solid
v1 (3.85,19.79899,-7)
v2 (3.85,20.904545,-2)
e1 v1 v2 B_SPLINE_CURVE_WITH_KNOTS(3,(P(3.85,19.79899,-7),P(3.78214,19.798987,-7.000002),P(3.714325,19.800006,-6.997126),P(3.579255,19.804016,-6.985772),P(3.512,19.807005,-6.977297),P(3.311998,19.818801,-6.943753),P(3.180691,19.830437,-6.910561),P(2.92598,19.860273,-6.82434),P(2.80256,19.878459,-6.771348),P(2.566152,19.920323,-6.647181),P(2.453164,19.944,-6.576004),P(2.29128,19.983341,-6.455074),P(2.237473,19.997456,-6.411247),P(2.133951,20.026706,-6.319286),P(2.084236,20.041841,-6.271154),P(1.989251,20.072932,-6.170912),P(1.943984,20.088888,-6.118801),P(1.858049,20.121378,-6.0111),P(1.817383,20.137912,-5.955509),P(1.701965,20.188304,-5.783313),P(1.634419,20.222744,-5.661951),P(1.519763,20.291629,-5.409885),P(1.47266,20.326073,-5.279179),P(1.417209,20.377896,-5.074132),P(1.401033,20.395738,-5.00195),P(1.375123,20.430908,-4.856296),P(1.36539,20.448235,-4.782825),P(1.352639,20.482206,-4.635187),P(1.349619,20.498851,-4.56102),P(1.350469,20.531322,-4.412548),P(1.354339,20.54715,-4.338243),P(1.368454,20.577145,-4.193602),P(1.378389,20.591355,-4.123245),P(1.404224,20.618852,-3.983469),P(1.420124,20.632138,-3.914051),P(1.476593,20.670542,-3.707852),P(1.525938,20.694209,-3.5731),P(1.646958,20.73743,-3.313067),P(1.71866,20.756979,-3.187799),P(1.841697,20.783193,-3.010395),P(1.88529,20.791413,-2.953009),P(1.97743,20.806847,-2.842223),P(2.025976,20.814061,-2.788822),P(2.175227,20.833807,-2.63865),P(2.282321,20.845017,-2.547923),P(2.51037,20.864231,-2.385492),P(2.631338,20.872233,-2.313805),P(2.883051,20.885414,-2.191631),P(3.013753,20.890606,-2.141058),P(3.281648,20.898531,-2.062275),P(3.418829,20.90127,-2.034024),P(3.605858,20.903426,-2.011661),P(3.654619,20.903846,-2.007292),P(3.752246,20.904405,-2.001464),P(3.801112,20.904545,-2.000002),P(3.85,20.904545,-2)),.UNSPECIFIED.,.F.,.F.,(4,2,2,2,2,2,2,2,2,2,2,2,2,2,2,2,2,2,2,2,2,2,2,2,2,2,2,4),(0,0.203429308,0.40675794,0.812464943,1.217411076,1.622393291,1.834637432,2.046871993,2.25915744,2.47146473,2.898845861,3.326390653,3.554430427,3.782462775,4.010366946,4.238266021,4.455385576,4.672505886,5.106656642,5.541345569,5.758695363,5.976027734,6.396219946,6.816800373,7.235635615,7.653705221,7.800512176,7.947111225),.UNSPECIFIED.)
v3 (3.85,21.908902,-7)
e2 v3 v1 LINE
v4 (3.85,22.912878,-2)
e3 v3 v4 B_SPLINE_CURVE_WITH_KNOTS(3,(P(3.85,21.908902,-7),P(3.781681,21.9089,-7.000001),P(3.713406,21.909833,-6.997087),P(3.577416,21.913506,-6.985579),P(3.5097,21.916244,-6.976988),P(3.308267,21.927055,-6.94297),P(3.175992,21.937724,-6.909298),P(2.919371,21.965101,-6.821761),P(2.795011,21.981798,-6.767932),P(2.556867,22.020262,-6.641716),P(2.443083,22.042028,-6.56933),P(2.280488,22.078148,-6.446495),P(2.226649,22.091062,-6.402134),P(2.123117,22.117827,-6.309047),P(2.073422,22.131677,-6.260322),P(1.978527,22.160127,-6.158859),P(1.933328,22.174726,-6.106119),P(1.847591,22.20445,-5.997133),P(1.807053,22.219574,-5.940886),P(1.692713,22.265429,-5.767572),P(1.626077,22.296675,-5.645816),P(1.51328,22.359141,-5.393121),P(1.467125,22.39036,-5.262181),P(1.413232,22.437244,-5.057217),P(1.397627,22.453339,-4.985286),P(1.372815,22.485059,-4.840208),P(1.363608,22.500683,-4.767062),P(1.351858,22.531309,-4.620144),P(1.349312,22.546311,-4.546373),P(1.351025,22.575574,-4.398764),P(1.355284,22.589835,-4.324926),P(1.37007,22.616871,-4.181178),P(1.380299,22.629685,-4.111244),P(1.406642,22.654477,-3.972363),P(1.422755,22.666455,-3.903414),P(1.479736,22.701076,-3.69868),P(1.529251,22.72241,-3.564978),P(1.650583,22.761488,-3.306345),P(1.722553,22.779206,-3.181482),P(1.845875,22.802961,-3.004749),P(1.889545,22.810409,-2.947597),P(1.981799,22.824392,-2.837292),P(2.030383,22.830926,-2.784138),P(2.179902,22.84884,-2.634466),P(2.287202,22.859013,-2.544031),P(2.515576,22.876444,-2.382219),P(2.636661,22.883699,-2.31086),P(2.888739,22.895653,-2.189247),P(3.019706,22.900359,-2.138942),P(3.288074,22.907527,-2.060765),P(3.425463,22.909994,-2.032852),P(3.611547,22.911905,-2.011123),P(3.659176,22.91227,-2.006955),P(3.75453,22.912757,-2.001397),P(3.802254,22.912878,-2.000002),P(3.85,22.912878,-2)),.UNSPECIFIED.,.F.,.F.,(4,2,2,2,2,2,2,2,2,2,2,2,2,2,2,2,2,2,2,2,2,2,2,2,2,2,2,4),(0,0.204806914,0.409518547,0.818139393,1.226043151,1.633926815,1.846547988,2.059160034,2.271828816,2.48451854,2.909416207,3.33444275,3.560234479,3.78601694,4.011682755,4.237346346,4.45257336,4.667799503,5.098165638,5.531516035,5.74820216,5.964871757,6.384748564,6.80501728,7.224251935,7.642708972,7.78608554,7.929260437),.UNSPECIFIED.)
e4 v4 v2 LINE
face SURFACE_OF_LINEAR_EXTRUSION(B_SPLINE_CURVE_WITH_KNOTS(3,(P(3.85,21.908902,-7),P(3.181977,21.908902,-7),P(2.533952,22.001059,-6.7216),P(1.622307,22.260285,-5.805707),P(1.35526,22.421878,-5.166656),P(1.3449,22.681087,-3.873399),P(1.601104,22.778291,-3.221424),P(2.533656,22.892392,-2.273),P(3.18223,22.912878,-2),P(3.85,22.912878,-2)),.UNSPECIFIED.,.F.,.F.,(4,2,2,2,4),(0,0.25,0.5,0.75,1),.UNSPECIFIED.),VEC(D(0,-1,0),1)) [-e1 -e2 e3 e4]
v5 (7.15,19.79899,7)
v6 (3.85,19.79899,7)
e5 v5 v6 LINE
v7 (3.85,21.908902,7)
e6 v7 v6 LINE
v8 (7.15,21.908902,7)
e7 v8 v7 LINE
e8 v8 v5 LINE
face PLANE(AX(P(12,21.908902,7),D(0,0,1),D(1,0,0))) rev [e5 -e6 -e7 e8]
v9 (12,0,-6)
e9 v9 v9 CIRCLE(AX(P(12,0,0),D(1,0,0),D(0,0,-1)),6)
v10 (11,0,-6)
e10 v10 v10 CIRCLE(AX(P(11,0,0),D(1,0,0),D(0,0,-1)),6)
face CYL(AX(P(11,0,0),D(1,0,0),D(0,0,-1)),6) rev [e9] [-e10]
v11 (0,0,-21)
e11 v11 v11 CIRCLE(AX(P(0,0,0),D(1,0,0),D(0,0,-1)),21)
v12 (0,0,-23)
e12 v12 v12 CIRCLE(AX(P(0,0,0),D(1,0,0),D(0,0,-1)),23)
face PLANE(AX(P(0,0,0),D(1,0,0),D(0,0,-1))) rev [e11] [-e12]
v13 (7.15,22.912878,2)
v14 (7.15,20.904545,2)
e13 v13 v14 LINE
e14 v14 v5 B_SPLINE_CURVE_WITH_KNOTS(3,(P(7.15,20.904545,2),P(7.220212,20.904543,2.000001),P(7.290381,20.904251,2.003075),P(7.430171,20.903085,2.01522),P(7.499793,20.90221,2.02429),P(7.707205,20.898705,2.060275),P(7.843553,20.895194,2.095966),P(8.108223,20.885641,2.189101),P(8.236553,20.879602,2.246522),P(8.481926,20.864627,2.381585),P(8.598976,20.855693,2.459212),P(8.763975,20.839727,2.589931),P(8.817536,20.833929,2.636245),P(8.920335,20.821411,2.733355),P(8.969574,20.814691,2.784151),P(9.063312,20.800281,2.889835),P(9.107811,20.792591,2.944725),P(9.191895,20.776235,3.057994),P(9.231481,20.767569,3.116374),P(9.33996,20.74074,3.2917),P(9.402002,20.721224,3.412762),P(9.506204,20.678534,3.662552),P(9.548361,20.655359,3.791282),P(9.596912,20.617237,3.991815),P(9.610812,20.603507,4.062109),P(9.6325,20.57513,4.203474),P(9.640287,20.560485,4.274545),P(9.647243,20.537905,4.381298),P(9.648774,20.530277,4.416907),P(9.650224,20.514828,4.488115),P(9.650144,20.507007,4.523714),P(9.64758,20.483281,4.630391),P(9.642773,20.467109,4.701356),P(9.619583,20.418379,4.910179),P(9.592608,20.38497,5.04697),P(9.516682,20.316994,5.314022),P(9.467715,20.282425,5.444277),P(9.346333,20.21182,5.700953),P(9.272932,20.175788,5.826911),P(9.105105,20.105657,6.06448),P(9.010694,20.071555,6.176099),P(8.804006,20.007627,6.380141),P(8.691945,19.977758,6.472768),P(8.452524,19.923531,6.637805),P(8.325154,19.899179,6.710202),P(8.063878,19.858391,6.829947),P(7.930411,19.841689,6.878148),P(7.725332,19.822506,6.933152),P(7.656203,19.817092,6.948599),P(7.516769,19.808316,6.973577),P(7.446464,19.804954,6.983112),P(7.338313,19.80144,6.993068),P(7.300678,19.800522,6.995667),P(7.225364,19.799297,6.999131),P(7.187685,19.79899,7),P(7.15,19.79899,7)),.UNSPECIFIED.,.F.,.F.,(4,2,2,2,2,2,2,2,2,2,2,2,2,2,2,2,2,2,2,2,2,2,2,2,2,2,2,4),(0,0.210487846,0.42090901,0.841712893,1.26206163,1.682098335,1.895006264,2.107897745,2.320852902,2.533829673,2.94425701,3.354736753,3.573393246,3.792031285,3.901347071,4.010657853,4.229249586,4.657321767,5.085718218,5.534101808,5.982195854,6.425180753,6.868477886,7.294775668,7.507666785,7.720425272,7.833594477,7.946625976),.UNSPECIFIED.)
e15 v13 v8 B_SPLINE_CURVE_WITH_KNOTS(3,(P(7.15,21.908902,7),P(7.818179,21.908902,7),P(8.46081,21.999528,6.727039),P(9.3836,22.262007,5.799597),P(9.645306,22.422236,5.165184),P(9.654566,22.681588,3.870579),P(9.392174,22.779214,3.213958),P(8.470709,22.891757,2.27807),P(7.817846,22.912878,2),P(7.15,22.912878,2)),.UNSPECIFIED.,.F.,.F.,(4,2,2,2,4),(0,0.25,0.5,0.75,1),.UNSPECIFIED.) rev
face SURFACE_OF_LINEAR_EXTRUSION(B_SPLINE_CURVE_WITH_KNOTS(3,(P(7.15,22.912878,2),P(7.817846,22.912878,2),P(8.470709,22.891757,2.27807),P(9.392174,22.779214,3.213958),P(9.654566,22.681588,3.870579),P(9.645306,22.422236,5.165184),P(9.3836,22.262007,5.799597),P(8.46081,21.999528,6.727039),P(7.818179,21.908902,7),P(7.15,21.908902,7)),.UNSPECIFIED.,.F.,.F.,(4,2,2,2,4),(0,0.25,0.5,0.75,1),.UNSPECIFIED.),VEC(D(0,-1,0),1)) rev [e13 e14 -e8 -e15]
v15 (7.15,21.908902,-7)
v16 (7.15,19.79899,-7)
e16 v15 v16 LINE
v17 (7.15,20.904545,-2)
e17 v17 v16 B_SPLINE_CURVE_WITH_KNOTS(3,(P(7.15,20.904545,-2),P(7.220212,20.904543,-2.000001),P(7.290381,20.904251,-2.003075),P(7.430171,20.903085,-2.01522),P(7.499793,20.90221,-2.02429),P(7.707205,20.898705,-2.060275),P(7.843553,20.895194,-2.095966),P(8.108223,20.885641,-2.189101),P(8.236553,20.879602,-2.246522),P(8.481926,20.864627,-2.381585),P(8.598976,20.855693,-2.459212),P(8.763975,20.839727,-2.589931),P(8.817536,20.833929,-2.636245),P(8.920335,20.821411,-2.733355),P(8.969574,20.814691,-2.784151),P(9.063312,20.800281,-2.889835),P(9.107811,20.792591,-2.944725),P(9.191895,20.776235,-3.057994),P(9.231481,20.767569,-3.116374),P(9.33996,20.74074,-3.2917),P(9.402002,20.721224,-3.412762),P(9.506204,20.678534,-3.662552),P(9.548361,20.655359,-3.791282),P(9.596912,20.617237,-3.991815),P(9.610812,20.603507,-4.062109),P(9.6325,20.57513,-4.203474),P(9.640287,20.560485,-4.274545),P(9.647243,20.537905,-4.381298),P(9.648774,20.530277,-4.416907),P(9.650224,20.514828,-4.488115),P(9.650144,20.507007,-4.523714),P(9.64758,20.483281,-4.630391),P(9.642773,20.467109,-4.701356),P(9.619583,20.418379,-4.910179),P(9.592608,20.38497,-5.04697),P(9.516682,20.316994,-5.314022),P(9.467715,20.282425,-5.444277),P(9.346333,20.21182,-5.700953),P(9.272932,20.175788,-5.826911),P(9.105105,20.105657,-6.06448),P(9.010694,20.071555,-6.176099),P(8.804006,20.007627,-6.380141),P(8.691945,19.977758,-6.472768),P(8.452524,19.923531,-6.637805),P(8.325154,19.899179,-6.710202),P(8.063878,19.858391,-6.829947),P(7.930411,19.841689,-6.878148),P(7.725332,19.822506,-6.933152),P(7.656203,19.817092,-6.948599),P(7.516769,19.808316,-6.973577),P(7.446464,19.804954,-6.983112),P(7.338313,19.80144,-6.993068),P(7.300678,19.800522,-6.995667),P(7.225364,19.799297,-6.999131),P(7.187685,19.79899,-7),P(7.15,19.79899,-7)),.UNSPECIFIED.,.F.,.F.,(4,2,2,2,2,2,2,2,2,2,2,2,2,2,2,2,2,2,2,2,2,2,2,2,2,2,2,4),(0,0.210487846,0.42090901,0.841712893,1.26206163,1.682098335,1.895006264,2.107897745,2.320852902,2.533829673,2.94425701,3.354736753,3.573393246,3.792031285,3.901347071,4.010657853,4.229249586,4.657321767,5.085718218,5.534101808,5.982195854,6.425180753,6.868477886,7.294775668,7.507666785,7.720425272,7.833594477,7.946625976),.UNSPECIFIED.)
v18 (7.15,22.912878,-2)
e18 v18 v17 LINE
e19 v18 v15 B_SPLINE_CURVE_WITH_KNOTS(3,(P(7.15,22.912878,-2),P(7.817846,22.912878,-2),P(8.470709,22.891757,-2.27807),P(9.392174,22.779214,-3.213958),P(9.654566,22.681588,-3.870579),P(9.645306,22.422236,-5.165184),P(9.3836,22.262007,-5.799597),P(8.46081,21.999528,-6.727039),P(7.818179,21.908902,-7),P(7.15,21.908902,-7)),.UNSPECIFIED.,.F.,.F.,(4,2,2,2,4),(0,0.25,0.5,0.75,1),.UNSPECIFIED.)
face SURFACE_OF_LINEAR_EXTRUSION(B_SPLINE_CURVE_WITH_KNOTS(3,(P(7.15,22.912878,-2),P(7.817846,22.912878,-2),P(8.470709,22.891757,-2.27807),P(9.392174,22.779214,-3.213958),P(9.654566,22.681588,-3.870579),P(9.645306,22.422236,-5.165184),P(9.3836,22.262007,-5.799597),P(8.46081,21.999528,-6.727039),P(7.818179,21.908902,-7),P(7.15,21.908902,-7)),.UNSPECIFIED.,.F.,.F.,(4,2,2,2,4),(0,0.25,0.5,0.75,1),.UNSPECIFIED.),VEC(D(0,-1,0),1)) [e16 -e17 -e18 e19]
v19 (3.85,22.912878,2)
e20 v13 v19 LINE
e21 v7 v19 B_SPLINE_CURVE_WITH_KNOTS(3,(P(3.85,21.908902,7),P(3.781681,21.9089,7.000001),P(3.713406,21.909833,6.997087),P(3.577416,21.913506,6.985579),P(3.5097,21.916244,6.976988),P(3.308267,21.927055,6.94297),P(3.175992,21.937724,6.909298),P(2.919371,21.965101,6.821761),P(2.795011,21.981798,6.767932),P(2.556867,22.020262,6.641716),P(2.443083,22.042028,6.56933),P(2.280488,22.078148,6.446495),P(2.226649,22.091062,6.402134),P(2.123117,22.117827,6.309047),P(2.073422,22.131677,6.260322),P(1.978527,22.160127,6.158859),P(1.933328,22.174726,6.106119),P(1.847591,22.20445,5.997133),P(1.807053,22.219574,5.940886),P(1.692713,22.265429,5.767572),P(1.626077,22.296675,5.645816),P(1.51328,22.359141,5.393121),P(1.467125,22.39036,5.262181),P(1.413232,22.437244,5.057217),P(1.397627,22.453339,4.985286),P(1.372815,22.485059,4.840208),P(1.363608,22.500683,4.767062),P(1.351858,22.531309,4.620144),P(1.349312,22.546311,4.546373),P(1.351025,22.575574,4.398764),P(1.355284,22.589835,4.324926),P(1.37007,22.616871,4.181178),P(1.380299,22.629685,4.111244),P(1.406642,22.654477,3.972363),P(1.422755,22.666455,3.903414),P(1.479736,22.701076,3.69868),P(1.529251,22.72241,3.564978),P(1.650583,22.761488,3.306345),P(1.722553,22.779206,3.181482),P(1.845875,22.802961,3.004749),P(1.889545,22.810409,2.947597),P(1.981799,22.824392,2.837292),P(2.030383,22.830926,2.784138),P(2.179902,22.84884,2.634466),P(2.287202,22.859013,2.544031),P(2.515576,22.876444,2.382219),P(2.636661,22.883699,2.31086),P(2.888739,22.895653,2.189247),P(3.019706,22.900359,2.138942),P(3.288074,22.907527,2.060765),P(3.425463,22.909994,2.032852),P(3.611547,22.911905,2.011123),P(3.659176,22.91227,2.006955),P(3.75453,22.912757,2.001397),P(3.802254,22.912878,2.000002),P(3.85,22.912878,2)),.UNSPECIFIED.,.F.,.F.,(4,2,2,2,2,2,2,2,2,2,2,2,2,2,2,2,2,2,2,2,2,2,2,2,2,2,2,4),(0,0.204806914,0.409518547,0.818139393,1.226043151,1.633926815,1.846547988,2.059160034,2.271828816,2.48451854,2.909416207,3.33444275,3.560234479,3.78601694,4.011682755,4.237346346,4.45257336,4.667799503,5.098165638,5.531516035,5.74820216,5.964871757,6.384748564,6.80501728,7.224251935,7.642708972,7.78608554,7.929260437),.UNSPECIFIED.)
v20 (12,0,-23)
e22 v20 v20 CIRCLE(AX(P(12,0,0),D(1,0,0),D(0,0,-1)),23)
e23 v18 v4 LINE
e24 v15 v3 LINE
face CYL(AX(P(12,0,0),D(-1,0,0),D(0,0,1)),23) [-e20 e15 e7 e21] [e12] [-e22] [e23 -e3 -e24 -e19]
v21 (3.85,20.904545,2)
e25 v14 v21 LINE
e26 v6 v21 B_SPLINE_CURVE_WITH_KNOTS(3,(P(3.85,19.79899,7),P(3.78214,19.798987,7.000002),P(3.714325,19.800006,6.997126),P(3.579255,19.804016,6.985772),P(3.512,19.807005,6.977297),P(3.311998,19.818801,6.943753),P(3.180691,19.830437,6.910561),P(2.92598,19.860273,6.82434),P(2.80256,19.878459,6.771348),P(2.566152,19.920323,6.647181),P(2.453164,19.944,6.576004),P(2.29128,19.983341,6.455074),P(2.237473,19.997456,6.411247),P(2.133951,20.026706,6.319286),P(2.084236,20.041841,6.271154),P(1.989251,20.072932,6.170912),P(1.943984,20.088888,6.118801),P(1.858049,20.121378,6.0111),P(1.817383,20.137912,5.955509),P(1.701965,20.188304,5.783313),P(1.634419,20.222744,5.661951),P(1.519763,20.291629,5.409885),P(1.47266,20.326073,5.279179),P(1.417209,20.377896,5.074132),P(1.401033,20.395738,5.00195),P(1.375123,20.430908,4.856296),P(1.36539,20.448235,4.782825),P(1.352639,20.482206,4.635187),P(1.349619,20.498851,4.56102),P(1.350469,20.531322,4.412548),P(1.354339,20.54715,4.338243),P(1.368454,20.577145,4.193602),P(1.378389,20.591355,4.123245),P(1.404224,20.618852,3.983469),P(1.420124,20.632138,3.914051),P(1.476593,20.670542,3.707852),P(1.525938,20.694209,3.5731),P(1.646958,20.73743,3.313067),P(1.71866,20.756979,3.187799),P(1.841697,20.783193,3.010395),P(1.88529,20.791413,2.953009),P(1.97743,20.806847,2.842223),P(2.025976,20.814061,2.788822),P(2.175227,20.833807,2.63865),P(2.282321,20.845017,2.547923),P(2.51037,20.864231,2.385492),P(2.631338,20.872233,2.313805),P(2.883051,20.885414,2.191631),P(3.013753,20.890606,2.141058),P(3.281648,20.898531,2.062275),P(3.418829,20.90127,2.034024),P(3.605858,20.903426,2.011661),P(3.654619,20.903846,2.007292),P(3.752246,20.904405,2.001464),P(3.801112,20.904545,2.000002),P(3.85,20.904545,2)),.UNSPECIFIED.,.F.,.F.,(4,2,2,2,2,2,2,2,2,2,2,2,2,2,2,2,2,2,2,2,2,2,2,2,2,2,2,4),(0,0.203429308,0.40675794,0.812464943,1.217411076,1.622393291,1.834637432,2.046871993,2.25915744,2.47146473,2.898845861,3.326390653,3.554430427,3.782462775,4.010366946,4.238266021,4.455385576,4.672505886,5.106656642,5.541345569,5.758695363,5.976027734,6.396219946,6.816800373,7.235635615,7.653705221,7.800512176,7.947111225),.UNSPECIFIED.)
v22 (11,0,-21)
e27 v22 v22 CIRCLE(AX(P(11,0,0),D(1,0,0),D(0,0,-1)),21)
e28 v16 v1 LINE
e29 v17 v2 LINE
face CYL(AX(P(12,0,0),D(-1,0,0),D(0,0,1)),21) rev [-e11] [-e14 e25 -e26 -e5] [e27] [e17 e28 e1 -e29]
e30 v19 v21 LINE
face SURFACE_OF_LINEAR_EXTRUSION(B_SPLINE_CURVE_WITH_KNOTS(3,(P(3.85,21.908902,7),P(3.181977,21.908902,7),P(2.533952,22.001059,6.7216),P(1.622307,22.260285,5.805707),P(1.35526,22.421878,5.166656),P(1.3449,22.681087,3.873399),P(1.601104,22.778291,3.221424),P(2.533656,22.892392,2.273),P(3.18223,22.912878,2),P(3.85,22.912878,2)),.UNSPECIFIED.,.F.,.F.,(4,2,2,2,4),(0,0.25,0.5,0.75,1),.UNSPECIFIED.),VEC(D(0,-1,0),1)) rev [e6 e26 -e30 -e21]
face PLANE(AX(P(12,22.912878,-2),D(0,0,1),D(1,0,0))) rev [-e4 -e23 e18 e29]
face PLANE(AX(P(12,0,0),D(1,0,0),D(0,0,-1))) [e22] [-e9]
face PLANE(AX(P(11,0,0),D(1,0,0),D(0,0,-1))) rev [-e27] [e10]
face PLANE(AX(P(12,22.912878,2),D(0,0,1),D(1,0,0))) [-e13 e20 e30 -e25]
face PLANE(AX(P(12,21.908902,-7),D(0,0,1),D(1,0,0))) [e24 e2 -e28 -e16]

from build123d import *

# Parameters (mm, degrees)
SKETCH1_R           = 23
SKETCH1_R_2         = 21
BOSS_EXTRUDE1_DEPTH = 12
CUT_EXTRUDE1_START  = 19.798989767
CUT_EXTRUDE1_DEPTH  = 3.113888708
BOSS_EXTRUDE2_START = -1
SKETCH3_R           = 21
SKETCH3_R_2         = 6
BOSS_EXTRUDE2_DEPTH = 1


# Read off the part's stored shape, not the designer's step: Cut-Extrude1
with BuildPart() as part:
    # Sketch1 → Boss-Extrude1 (new body)
    with BuildSketch(Plane(origin=(0, 0, 0), x_dir=(0, 0, -1), z_dir=(1, 0, 0))):
        Circle(SKETCH1_R)
        Circle(SKETCH1_R_2, mode=Mode.SUBTRACT)
    extrude(amount=BOSS_EXTRUDE1_DEPTH)

    # Cut-Extrude1 outline → Cut-Extrude1 (cut)
    with BuildSketch(Plane(origin=(0, 0, 0), x_dir=(1, 0, 0), z_dir=(0, 1, 0)).offset(CUT_EXTRUDE1_START)):
        with BuildLine():
            Line((3.85, 2), (7.15, 2))
            add(Edge.make_bspline(
                [(7.15, 2), (7.817845854, 2), (8.470708827, 2.278069652), (9.392173726, 3.213958296), (9.654566139, 3.870579279), (9.645305955, 5.165184319), (9.383600306, 5.79959696), (8.460809694, 6.727038511), (7.818179406, 7), (7.15, 7)],
                knots=[0, 0, 0, 0, 0.25, 0.25, 0.5, 0.5, 0.75, 0.75, 1, 1, 1, 1], degree=3))
            Line((7.15, 7), (3.85, 7))
            add(Edge.make_bspline(
                [(3.85, 7), (3.181977083, 7), (2.533951966, 6.72160004), (1.622306662, 5.805707302), (1.355260445, 5.166655745), (1.344899993, 3.873398622), (1.601104231, 3.221423625), (2.533655688, 2.273000364), (3.182229779, 2), (3.85, 2)],
                knots=[0, 0, 0, 0, 0.25, 0.25, 0.5, 0.5, 0.75, 0.75, 1, 1, 1, 1], degree=3))
        make_face()
        with BuildLine():
            add(Edge.make_bspline(
                [(7.15, -2), (7.817845854, -2), (8.470708827, -2.278069652), (9.392173726, -3.213958296), (9.654566139, -3.870579279), (9.645305955, -5.165184319), (9.383600306, -5.79959696), (8.460809694, -6.727038511), (7.818179406, -7), (7.15, -7)],
                knots=[0, 0, 0, 0, 0.25, 0.25, 0.5, 0.5, 0.75, 0.75, 1, 1, 1, 1], degree=3))
            Line((7.15, -2), (3.85, -2))
            add(Edge.make_bspline(
                [(3.85, -7), (3.181977083, -7), (2.533951966, -6.72160004), (1.622306662, -5.805707302), (1.355260445, -5.166655745), (1.344899993, -3.873398622), (1.601104231, -3.221423625), (2.533655688, -2.273000364), (3.182229779, -2), (3.85, -2)],
                knots=[0, 0, 0, 0, 0.25, 0.25, 0.5, 0.5, 0.75, 0.75, 1, 1, 1, 1], degree=3))
            Line((3.85, -7), (7.15, -7))
        make_face()
    extrude(amount=CUT_EXTRUDE1_DEPTH, mode=Mode.SUBTRACT)

    # Sketch3 → Boss-Extrude2 (add)
    with BuildSketch(Plane(origin=(12, 0, 0), x_dir=(0, 0, -1), z_dir=(1, 0, 0)).offset(BOSS_EXTRUDE2_START)):
        Circle(SKETCH3_R)
        Circle(SKETCH3_R_2, mode=Mode.SUBTRACT)
    extrude(amount=BOSS_EXTRUDE2_DEPTH)


solid = part.part
